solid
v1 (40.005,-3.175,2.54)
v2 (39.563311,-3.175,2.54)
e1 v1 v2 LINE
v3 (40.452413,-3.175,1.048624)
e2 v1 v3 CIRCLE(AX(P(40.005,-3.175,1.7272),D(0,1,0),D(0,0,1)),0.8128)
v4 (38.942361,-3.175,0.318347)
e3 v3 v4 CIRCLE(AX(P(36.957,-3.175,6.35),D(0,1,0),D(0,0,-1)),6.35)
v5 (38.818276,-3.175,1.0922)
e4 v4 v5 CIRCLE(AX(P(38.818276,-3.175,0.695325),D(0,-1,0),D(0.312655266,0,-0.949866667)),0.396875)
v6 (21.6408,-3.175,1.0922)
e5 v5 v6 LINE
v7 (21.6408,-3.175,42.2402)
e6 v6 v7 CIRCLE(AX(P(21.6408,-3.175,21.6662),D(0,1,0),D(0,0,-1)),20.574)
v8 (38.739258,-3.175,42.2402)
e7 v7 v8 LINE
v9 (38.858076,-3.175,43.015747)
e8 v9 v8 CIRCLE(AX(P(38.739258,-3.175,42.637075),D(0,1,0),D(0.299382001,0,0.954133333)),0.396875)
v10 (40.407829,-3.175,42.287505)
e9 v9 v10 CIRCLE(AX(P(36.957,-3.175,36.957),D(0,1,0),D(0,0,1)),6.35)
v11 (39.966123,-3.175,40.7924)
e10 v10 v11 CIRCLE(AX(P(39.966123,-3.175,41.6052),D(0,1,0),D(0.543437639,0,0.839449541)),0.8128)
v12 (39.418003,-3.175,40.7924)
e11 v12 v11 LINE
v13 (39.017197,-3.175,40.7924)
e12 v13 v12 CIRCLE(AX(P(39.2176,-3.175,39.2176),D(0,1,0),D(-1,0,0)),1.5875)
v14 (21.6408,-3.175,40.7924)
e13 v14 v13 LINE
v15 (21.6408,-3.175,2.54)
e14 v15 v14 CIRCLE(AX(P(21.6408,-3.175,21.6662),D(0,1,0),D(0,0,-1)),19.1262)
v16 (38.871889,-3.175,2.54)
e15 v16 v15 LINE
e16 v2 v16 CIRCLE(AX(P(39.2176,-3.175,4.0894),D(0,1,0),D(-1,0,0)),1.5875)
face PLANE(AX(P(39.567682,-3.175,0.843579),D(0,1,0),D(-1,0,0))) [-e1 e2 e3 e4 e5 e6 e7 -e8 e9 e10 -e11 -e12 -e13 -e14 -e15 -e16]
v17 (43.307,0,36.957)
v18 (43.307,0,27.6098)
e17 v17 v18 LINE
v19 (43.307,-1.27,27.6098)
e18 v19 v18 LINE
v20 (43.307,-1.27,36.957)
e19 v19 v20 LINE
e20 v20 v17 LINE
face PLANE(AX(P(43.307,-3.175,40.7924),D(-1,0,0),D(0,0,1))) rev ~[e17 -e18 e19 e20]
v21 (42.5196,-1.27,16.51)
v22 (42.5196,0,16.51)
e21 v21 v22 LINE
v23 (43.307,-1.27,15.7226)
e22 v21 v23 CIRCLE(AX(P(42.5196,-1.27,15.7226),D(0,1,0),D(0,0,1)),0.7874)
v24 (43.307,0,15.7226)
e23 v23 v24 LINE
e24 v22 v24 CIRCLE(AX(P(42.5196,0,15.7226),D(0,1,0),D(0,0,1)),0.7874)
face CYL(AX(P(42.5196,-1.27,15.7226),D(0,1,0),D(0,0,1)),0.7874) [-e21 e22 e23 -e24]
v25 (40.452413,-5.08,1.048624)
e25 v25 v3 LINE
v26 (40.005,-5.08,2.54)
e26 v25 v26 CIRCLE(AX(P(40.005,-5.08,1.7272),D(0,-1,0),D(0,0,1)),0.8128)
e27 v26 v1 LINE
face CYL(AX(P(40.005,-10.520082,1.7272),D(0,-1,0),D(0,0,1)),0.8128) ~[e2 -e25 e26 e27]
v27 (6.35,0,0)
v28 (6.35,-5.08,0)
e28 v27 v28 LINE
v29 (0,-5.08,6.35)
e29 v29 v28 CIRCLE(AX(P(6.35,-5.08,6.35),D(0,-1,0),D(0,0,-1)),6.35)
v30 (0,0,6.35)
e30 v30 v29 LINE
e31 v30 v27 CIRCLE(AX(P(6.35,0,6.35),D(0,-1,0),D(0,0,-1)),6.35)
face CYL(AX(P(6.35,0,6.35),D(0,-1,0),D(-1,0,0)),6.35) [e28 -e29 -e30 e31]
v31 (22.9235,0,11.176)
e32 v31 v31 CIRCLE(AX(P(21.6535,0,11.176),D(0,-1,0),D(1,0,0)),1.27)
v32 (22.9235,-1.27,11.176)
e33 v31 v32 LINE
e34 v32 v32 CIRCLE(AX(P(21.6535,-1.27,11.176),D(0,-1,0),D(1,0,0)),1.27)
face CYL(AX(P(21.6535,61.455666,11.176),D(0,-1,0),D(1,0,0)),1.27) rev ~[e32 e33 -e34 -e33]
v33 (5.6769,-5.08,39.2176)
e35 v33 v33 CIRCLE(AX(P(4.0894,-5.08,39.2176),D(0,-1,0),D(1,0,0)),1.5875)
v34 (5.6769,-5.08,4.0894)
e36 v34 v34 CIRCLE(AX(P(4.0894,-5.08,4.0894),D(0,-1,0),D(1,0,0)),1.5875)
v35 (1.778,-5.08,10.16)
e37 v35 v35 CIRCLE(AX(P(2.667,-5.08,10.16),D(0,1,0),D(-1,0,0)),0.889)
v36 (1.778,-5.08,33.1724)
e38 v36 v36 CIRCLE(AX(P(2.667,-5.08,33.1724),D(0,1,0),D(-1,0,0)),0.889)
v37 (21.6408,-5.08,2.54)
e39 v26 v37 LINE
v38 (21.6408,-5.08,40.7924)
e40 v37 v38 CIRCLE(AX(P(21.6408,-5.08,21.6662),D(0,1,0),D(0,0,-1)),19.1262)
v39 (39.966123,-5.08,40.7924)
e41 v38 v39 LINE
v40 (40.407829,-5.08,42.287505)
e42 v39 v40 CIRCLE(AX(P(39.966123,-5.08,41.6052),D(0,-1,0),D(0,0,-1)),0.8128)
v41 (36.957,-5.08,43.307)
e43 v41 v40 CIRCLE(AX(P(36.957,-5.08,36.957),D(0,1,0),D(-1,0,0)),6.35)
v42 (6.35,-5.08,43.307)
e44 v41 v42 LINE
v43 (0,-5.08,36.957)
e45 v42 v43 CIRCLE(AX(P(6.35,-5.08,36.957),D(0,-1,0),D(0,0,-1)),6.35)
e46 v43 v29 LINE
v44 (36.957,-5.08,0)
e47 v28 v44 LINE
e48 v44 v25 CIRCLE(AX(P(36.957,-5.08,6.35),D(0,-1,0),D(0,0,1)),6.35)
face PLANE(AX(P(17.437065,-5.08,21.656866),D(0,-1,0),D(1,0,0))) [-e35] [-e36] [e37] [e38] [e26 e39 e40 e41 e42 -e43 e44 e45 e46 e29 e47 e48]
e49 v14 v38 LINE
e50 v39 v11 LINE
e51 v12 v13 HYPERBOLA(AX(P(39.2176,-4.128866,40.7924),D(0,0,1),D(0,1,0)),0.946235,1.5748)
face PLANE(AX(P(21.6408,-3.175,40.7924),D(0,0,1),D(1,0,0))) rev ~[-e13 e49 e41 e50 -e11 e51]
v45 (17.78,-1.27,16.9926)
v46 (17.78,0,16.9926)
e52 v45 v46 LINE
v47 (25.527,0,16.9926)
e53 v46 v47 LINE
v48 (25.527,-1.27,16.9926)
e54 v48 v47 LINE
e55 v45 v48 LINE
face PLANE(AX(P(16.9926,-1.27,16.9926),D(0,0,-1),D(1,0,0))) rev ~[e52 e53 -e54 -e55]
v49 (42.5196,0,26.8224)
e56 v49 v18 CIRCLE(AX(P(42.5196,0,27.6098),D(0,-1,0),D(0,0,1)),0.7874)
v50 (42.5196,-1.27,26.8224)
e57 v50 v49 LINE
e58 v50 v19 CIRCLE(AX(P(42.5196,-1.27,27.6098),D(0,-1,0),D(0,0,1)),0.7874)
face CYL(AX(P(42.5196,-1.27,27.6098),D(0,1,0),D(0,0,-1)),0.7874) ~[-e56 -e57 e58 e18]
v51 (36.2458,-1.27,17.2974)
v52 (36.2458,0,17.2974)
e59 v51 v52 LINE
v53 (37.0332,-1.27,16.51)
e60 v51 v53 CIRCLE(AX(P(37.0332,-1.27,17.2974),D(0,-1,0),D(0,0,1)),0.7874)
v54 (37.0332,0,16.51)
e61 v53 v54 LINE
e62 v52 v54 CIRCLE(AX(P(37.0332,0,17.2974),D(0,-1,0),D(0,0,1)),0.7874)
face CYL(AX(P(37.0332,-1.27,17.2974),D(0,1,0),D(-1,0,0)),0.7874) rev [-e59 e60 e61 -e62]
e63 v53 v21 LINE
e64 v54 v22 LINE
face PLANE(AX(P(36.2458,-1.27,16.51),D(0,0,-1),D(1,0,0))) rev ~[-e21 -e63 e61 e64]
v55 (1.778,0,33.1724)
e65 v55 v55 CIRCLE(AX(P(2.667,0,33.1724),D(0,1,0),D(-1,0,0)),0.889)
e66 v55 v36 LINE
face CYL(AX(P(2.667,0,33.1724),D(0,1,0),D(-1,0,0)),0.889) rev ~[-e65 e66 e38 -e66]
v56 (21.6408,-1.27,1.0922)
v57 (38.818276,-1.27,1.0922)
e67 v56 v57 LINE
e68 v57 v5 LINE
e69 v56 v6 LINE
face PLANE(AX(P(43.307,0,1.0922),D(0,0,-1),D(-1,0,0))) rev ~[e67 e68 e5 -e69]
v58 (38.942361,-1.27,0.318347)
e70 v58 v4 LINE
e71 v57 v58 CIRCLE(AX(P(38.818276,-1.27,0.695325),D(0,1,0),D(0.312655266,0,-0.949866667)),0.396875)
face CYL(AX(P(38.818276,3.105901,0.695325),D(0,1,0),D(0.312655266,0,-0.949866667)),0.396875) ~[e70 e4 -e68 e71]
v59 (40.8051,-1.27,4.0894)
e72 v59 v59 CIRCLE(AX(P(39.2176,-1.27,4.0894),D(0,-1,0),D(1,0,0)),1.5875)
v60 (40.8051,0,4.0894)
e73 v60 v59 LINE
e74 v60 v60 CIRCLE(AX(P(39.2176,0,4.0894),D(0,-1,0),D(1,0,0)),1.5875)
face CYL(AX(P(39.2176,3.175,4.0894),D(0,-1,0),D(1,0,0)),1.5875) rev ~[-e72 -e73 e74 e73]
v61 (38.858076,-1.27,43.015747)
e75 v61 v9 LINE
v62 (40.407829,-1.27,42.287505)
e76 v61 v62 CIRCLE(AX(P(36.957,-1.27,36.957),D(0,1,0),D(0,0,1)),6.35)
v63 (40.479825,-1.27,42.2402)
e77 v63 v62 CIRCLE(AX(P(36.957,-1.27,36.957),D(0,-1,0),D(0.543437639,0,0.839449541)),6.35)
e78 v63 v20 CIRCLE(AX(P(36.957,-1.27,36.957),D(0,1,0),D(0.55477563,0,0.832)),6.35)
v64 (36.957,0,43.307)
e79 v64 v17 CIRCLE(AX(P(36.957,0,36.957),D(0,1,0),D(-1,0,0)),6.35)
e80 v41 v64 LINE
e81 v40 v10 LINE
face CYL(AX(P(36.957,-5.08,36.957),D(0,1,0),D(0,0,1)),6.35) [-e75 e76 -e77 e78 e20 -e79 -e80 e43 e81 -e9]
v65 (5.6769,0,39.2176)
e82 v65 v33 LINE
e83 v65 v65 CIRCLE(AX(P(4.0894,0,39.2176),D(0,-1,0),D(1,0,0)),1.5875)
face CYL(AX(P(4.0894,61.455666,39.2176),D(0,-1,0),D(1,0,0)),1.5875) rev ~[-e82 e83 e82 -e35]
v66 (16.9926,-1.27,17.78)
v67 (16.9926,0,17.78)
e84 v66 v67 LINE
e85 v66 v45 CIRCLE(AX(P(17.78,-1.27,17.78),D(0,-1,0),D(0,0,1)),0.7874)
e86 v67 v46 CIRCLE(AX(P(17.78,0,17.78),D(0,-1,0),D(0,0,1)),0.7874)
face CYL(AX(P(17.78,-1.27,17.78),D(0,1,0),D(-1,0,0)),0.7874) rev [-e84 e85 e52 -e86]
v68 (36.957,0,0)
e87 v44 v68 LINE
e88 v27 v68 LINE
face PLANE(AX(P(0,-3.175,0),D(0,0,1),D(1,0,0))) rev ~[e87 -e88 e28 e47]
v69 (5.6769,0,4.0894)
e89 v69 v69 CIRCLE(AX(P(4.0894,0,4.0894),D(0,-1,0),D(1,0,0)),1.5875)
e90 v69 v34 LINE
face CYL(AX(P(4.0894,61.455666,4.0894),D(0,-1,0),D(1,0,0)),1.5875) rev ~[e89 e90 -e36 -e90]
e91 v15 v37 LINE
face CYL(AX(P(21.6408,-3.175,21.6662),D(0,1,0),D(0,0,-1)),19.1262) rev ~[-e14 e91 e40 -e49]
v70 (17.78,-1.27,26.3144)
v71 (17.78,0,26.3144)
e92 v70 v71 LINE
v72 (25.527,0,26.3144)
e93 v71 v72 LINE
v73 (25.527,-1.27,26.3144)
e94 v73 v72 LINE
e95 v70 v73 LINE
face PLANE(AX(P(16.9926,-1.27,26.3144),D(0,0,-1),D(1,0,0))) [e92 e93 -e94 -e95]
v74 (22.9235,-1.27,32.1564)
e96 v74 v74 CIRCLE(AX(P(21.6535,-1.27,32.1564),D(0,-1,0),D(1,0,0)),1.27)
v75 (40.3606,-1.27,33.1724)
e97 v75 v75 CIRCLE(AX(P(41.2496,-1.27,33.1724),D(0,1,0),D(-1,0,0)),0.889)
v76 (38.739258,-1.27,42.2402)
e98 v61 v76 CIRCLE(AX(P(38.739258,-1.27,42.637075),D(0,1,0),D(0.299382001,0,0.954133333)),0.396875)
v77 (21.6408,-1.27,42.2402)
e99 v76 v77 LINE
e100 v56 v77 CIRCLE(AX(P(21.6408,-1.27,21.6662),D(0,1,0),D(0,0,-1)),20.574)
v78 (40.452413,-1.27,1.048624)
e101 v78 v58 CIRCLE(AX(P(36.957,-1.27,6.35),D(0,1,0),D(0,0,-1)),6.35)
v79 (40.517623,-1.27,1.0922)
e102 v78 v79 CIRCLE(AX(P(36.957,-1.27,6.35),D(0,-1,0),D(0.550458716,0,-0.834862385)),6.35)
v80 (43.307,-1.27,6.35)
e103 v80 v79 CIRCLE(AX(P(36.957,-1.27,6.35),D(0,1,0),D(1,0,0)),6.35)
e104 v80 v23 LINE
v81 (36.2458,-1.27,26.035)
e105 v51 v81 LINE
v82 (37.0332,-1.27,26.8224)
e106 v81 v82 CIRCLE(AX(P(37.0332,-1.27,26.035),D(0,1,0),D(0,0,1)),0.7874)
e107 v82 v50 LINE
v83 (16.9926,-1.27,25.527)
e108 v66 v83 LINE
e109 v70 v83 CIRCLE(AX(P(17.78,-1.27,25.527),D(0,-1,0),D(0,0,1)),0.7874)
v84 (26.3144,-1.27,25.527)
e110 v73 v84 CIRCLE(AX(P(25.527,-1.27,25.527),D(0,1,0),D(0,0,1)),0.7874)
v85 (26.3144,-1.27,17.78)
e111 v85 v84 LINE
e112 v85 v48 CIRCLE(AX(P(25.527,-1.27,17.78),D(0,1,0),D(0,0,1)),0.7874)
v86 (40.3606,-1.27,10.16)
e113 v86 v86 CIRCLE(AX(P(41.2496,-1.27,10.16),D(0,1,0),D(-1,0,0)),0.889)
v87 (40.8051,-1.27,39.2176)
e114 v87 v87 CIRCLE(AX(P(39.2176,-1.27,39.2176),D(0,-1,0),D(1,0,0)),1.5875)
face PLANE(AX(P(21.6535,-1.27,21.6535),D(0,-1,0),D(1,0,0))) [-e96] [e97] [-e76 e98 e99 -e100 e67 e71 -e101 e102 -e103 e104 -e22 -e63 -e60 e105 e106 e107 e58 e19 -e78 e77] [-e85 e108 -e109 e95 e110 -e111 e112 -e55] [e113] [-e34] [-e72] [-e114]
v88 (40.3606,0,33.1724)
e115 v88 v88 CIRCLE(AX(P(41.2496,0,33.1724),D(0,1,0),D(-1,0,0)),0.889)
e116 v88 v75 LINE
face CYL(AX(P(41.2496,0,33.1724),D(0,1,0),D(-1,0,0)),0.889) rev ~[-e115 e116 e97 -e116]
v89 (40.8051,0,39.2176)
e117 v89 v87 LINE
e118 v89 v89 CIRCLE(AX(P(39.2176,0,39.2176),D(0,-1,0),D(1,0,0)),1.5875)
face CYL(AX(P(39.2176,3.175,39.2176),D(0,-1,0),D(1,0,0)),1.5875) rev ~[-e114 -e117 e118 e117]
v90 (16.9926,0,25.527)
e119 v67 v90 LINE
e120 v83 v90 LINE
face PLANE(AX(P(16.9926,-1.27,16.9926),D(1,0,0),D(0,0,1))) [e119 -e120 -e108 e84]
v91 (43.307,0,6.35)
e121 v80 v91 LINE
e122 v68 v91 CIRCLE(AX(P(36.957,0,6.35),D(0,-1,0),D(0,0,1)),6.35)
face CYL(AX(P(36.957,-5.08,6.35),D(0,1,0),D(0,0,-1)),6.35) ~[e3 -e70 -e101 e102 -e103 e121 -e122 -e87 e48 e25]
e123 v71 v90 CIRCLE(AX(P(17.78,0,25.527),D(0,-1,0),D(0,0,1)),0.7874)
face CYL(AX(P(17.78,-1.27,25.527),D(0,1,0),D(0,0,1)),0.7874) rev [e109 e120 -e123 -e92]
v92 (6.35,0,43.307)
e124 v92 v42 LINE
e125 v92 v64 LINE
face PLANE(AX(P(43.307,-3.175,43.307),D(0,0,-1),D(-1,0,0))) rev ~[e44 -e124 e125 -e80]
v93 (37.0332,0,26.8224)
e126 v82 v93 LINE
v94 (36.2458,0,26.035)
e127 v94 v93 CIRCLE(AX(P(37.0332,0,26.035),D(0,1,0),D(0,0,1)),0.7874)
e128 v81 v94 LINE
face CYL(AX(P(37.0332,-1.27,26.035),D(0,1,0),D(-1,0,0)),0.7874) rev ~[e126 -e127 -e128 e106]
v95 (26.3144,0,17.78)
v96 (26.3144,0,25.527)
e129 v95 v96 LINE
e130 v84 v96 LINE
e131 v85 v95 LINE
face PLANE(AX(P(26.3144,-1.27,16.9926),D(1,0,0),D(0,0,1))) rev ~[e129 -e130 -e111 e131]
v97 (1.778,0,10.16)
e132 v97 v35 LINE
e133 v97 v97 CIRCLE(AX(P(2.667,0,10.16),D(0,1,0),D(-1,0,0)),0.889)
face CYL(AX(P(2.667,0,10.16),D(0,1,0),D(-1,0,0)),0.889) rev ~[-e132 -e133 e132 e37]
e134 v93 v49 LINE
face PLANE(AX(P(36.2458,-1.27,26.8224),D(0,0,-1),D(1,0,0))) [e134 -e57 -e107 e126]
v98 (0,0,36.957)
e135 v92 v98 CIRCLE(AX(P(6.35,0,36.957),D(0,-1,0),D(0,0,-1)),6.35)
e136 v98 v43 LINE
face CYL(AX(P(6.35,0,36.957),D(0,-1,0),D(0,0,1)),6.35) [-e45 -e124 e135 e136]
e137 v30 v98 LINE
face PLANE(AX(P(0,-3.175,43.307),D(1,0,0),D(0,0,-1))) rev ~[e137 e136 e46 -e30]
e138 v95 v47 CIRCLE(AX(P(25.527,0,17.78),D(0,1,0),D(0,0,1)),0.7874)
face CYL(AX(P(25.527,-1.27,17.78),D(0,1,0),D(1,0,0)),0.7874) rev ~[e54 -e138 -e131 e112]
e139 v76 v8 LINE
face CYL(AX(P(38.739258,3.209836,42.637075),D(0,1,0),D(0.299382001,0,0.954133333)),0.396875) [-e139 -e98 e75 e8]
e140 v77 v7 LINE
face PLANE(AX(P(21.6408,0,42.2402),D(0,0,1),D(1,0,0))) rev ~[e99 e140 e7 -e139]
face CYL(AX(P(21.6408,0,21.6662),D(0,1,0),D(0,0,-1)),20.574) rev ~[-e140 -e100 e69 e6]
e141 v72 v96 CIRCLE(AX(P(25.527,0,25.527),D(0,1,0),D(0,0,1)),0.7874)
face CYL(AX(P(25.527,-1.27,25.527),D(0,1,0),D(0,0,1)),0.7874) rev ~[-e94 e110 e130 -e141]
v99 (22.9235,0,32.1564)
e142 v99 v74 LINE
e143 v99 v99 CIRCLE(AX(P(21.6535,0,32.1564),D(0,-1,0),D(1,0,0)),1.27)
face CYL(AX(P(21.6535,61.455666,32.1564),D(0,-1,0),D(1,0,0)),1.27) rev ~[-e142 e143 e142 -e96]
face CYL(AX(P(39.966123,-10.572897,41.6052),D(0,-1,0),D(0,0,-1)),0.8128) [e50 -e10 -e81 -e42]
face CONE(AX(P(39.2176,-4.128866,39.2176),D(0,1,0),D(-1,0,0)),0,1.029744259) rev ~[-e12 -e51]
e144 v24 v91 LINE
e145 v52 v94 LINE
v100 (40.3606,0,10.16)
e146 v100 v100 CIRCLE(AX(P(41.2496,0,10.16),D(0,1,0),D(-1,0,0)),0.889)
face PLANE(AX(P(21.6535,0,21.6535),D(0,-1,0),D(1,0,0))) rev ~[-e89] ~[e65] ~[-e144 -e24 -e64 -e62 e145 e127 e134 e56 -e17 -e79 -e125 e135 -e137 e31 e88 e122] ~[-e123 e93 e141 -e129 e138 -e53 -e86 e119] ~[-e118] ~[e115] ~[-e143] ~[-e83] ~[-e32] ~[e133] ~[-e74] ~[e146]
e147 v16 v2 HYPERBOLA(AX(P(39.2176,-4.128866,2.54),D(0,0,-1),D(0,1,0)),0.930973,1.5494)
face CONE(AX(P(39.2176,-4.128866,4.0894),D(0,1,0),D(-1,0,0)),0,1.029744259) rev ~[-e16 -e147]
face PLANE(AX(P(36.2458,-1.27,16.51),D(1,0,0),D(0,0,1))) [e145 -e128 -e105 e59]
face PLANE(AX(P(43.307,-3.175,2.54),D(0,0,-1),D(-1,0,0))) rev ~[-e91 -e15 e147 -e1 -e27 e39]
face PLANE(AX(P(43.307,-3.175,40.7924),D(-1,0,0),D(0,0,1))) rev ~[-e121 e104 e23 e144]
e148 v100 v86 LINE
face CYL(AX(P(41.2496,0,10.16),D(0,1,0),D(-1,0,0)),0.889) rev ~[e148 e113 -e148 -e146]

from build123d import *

# Parameters (mm, degrees)
F0_W         = 43.307
F0_H         = 43.307
F1_DEPTH     = 1.27
F3_DEPTH     = 3.175
F5_DEPTH     = 1.905
F6_R         = 0.889
F7_DEPTH     = 5.081
F8_W         = 9.3218
F8_H         = 9.3218
F8_W_2       = 7.0612
F8_H_2       = 10.3124
F10_DEPTH    = 1.27
F11_D        = 3.175
F14_D        = 2.54
F15_R        = 6.35
F16_T4_DEPTH = 12.7851645967
F16_T9_DEPTH = 12.8907938144
F17_R        = 0.7874
F18_D        = 3.175
F18_DEPTH    = 3.175
F18_TIP      = 0.9538662327
F19_T4_DEPTH = 6.3848359064
F19_T9_DEPTH = 6.2809008493


# Not quite as in the source:
# - a fillet or chamfer that OpenCascade refuses, or shapes differently, is made with other operations: its cross-section is extruded or revolved along the edge and cut away or added


with BuildPart() as f1:
    # F0 (on Front) → F1 (new body)
    with BuildSketch(Plane.XZ):
        with Locations((21.6535, 21.6535)):
            Rectangle(F0_W, F0_H)
    extrude(amount=F1_DEPTH)

    # F2 (on Front) → F3 (join)
    with BuildSketch(Plane.XZ):
        with BuildLine():
            Line((43.307, 43.307), (0, 43.307))
            Line((0, 43.307), (0, 0))
            Line((0, 0), (43.307, 0))
            Line((43.307, 0), (43.307, 1.0922))
            Line((43.307, 1.0922), (21.6408, 1.0922))
            ThreePointArc((21.6408, 1.0922), (1.0668, 21.6662), (21.6408, 42.2402))
            Line((21.6408, 42.2402), (43.307, 42.2402))
            Line((43.307, 42.2402), (43.307, 43.307))
        make_face()
    extrude(amount=F3_DEPTH)

    # F4 (on face) → F5 (join)
    with BuildSketch(Plane.XZ.offset(3.175)):
        with BuildLine():
            Line((43.307, 43.307), (0, 43.307))
            Line((0, 43.307), (0, 0))
            Line((0, 0), (43.307, 0))
            Line((43.307, 0), (43.307, 2.54))
            Line((43.307, 2.54), (21.6408, 2.54))
            ThreePointArc((21.6408, 2.54), (2.5146, 21.6662), (21.6408, 40.7924))
            Line((21.6408, 40.7924), (43.307, 40.7924))
            Line((43.307, 40.7924), (43.307, 43.307))
        make_face()
    extrude(amount=F5_DEPTH)

    # F6 (on face) → F7 (cut, through all)
    with BuildSketch(Plane(origin=(0, 0, 0), x_dir=(-1, 0, 0), z_dir=(0, 1, 0))):
        with Locations((-41.2496, 33.1724)):
            Circle(F6_R)
        with Locations((-2.667, 33.1724)):
            Circle(F6_R)
        with Locations((-41.2496, 10.16)):
            Circle(F6_R)
        with Locations((-2.667, 10.16)):
            Circle(F6_R)
    extrude(amount=-F7_DEPTH, mode=Mode.SUBTRACT)

    # F8 (on face) → F10 (cut, through all)
    with BuildSketch(Plane.XZ.offset(1.27)):
        with Locations((21.6535, 21.6535)):
            Rectangle(F8_W, F8_H)
        with Locations((39.7764, 21.6662)):
            Rectangle(F8_W_2, F8_H_2)
    extrude(amount=-F10_DEPTH, mode=Mode.SUBTRACT)

    # F11 (through all)
    with Locations(Plane(origin=(0, 0, 0), x_dir=(-1, 0, 0), z_dir=(0, 1, 0))):
        with Locations((-4.0894, 39.2176), (-4.0894, 4.0894)):
            Hole(F11_D / 2)

    # F14 (through all)
    with Locations(Plane(origin=(0, 0, 0), x_dir=(-1, 0, 0), z_dir=(0, 1, 0))):
        with Locations((-21.6535, 32.1564), (-21.6535, 11.176)):
            Hole(F14_D / 2)

    # F15
    f15_edges = [f1.edges().sort_by_distance(p)[0] for p in [
        (0, -2.54, 43.307),
        (43.307, -2.54, 43.307),
        (43.307, -2.54, 0),
        (0, -2.54, 0),
    ]]
    fillet(f15_edges, radius=F15_R)

    # F16: fillet of radius 0.8128 on 2 edges, made by hand


with BuildPart() as f16_tool2:
    # F16_s3 → F16_t4 (new body)
    with BuildSketch(Plane.XZ.offset(10.5200822984)):
        with BuildLine():
            ThreePointArc((40.005, 2.54), (40.7835212046, 1.9607563614), (40.452412844, 1.0486238532))
            ThreePointArc((40.452412844, 1.0486238532), (41.3090658387, 1.7259300464), (42.037, 2.54))
            Line((42.037, 2.54), (40.005, 2.54))
        make_face()
    extrude(amount=-F16_T4_DEPTH)

    split(bisect_by=Plane.XZ.offset(1.27), keep=Keep.TOP)


with BuildPart() as f1_1:
    add(f1.part)

    # F16_t1: cut F16_tool2
    add(f16_tool2.part, mode=Mode.SUBTRACT)


with BuildPart() as f16_tool7:
    # F16_s8 → F16_t9 (new body)
    with BuildSketch(Plane.XZ.offset(10.5728969072)):
        with BuildLine():
            ThreePointArc((39.9661228955, 40.7924), (40.7456166441, 41.374910322), (40.4078290086, 42.2875045872))
            ThreePointArc((40.4078290086, 42.2875045872), (41.2779959557, 41.6101165847), (42.0178504068, 40.7924))
            Line((42.0178504068, 40.7924), (39.9661228955, 40.7924))
        make_face()
    extrude(amount=-F16_T9_DEPTH)

    split(bisect_by=Plane.XZ.offset(1.27), keep=Keep.TOP)


with BuildPart() as f1_2:
    add(f1_1.part)

    # F16_t6: cut F16_tool7
    add(f16_tool7.part, mode=Mode.SUBTRACT)

    # F17
    f17_edges = [f1_2.edges().sort_by_distance(p)[0] for p in [
        (43.307, -0.635, 26.8224),
        (36.2458, -0.635, 26.8224),
        (16.9926, -0.635, 26.3144),
        (16.9926, -0.635, 16.9926),
        (26.3144, -0.635, 16.9926),
        (43.307, -0.635, 16.51),
        (36.2458, -0.635, 16.51),
        (26.3144, -0.635, 26.3144),
    ]]
    fillet(f17_edges, radius=F17_R)

    # F18
    with Locations(Plane(origin=(0, 0, 0), x_dir=(-1, 0, 0), z_dir=(0, 1, 0))):
        with Locations((-39.2176, 4.0894), (-39.2176, 39.2176)):
            Hole(F18_D / 2, depth=F18_DEPTH)
            with Locations((0, 0, -(F18_DEPTH + F18_TIP / 2))):  # 118° drill point
                Cone(0, F18_D / 2, F18_TIP, mode=Mode.SUBTRACT)

    # F19: fillet of radius 0.396875 on 2 edges, made by hand


with BuildPart() as f19_tool2:
    # F19_s3 → F19_t4 (new body)
    with BuildSketch(Plane.XZ.offset(-3.2098359064)):
        with BuildLine():
            ThreePointArc((38.8580757032, 43.0157466667), (39.1315562434, 42.57697322), (38.7392584717, 42.2402))
            Line((38.7392584717, 42.2402), (38.7392584717, 42.2005125))
            Line((38.7392584717, 42.2005125), (40.4734874982, 42.2005125))
            Line((40.4734874982, 42.2005125), (40.4982611604, 42.2712058594))
            ThreePointArc((40.4982611604, 42.2712058594), (40.4293966899, 42.3208202408), (38.8699574263, 43.0536138333))
            Line((38.8699574263, 43.0536138333), (38.8580757032, 43.0157466667))
        make_face()
    extrude(amount=F19_T4_DEPTH)

    split(bisect_by=Plane.XZ.offset(1.27), keep=Keep.TOP)


with BuildPart() as f1_3:
    add(f1_2.part)

    # F19_t1: cut F19_tool2
    add(f19_tool2.part, mode=Mode.SUBTRACT)


with BuildPart() as f19_tool7:
    # F19_s8 → F19_t9 (new body)
    with BuildSketch(Plane.XZ.offset(-3.1059008493)):
        with BuildLine():
            ThreePointArc((38.9423609411, 0.3183466667), (39.2101451473, 0.7581600602), (38.8182758823, 1.0922))
            Line((38.8182758823, 1.0922), (38.8182758823, 1.1318875))
            Line((38.8182758823, 1.1318875), (40.5123646026, 1.1318875))
            Line((40.5123646026, 1.1318875), (40.5371382648, 1.0611941406))
            ThreePointArc((40.5371382648, 1.0611941406), (40.4742591743, 1.0154902523), (38.954769447, 0.2806488333))
            Line((38.954769447, 0.2806488333), (38.9423609411, 0.3183466667))
        make_face()
    extrude(amount=F19_T9_DEPTH)

    split(bisect_by=Plane.XZ.offset(1.27), keep=Keep.TOP)


with BuildPart() as f1_4:
    add(f1_3.part)

    # F19_t6: cut F19_tool7
    add(f19_tool7.part, mode=Mode.SUBTRACT)


solid = f1_4.part
